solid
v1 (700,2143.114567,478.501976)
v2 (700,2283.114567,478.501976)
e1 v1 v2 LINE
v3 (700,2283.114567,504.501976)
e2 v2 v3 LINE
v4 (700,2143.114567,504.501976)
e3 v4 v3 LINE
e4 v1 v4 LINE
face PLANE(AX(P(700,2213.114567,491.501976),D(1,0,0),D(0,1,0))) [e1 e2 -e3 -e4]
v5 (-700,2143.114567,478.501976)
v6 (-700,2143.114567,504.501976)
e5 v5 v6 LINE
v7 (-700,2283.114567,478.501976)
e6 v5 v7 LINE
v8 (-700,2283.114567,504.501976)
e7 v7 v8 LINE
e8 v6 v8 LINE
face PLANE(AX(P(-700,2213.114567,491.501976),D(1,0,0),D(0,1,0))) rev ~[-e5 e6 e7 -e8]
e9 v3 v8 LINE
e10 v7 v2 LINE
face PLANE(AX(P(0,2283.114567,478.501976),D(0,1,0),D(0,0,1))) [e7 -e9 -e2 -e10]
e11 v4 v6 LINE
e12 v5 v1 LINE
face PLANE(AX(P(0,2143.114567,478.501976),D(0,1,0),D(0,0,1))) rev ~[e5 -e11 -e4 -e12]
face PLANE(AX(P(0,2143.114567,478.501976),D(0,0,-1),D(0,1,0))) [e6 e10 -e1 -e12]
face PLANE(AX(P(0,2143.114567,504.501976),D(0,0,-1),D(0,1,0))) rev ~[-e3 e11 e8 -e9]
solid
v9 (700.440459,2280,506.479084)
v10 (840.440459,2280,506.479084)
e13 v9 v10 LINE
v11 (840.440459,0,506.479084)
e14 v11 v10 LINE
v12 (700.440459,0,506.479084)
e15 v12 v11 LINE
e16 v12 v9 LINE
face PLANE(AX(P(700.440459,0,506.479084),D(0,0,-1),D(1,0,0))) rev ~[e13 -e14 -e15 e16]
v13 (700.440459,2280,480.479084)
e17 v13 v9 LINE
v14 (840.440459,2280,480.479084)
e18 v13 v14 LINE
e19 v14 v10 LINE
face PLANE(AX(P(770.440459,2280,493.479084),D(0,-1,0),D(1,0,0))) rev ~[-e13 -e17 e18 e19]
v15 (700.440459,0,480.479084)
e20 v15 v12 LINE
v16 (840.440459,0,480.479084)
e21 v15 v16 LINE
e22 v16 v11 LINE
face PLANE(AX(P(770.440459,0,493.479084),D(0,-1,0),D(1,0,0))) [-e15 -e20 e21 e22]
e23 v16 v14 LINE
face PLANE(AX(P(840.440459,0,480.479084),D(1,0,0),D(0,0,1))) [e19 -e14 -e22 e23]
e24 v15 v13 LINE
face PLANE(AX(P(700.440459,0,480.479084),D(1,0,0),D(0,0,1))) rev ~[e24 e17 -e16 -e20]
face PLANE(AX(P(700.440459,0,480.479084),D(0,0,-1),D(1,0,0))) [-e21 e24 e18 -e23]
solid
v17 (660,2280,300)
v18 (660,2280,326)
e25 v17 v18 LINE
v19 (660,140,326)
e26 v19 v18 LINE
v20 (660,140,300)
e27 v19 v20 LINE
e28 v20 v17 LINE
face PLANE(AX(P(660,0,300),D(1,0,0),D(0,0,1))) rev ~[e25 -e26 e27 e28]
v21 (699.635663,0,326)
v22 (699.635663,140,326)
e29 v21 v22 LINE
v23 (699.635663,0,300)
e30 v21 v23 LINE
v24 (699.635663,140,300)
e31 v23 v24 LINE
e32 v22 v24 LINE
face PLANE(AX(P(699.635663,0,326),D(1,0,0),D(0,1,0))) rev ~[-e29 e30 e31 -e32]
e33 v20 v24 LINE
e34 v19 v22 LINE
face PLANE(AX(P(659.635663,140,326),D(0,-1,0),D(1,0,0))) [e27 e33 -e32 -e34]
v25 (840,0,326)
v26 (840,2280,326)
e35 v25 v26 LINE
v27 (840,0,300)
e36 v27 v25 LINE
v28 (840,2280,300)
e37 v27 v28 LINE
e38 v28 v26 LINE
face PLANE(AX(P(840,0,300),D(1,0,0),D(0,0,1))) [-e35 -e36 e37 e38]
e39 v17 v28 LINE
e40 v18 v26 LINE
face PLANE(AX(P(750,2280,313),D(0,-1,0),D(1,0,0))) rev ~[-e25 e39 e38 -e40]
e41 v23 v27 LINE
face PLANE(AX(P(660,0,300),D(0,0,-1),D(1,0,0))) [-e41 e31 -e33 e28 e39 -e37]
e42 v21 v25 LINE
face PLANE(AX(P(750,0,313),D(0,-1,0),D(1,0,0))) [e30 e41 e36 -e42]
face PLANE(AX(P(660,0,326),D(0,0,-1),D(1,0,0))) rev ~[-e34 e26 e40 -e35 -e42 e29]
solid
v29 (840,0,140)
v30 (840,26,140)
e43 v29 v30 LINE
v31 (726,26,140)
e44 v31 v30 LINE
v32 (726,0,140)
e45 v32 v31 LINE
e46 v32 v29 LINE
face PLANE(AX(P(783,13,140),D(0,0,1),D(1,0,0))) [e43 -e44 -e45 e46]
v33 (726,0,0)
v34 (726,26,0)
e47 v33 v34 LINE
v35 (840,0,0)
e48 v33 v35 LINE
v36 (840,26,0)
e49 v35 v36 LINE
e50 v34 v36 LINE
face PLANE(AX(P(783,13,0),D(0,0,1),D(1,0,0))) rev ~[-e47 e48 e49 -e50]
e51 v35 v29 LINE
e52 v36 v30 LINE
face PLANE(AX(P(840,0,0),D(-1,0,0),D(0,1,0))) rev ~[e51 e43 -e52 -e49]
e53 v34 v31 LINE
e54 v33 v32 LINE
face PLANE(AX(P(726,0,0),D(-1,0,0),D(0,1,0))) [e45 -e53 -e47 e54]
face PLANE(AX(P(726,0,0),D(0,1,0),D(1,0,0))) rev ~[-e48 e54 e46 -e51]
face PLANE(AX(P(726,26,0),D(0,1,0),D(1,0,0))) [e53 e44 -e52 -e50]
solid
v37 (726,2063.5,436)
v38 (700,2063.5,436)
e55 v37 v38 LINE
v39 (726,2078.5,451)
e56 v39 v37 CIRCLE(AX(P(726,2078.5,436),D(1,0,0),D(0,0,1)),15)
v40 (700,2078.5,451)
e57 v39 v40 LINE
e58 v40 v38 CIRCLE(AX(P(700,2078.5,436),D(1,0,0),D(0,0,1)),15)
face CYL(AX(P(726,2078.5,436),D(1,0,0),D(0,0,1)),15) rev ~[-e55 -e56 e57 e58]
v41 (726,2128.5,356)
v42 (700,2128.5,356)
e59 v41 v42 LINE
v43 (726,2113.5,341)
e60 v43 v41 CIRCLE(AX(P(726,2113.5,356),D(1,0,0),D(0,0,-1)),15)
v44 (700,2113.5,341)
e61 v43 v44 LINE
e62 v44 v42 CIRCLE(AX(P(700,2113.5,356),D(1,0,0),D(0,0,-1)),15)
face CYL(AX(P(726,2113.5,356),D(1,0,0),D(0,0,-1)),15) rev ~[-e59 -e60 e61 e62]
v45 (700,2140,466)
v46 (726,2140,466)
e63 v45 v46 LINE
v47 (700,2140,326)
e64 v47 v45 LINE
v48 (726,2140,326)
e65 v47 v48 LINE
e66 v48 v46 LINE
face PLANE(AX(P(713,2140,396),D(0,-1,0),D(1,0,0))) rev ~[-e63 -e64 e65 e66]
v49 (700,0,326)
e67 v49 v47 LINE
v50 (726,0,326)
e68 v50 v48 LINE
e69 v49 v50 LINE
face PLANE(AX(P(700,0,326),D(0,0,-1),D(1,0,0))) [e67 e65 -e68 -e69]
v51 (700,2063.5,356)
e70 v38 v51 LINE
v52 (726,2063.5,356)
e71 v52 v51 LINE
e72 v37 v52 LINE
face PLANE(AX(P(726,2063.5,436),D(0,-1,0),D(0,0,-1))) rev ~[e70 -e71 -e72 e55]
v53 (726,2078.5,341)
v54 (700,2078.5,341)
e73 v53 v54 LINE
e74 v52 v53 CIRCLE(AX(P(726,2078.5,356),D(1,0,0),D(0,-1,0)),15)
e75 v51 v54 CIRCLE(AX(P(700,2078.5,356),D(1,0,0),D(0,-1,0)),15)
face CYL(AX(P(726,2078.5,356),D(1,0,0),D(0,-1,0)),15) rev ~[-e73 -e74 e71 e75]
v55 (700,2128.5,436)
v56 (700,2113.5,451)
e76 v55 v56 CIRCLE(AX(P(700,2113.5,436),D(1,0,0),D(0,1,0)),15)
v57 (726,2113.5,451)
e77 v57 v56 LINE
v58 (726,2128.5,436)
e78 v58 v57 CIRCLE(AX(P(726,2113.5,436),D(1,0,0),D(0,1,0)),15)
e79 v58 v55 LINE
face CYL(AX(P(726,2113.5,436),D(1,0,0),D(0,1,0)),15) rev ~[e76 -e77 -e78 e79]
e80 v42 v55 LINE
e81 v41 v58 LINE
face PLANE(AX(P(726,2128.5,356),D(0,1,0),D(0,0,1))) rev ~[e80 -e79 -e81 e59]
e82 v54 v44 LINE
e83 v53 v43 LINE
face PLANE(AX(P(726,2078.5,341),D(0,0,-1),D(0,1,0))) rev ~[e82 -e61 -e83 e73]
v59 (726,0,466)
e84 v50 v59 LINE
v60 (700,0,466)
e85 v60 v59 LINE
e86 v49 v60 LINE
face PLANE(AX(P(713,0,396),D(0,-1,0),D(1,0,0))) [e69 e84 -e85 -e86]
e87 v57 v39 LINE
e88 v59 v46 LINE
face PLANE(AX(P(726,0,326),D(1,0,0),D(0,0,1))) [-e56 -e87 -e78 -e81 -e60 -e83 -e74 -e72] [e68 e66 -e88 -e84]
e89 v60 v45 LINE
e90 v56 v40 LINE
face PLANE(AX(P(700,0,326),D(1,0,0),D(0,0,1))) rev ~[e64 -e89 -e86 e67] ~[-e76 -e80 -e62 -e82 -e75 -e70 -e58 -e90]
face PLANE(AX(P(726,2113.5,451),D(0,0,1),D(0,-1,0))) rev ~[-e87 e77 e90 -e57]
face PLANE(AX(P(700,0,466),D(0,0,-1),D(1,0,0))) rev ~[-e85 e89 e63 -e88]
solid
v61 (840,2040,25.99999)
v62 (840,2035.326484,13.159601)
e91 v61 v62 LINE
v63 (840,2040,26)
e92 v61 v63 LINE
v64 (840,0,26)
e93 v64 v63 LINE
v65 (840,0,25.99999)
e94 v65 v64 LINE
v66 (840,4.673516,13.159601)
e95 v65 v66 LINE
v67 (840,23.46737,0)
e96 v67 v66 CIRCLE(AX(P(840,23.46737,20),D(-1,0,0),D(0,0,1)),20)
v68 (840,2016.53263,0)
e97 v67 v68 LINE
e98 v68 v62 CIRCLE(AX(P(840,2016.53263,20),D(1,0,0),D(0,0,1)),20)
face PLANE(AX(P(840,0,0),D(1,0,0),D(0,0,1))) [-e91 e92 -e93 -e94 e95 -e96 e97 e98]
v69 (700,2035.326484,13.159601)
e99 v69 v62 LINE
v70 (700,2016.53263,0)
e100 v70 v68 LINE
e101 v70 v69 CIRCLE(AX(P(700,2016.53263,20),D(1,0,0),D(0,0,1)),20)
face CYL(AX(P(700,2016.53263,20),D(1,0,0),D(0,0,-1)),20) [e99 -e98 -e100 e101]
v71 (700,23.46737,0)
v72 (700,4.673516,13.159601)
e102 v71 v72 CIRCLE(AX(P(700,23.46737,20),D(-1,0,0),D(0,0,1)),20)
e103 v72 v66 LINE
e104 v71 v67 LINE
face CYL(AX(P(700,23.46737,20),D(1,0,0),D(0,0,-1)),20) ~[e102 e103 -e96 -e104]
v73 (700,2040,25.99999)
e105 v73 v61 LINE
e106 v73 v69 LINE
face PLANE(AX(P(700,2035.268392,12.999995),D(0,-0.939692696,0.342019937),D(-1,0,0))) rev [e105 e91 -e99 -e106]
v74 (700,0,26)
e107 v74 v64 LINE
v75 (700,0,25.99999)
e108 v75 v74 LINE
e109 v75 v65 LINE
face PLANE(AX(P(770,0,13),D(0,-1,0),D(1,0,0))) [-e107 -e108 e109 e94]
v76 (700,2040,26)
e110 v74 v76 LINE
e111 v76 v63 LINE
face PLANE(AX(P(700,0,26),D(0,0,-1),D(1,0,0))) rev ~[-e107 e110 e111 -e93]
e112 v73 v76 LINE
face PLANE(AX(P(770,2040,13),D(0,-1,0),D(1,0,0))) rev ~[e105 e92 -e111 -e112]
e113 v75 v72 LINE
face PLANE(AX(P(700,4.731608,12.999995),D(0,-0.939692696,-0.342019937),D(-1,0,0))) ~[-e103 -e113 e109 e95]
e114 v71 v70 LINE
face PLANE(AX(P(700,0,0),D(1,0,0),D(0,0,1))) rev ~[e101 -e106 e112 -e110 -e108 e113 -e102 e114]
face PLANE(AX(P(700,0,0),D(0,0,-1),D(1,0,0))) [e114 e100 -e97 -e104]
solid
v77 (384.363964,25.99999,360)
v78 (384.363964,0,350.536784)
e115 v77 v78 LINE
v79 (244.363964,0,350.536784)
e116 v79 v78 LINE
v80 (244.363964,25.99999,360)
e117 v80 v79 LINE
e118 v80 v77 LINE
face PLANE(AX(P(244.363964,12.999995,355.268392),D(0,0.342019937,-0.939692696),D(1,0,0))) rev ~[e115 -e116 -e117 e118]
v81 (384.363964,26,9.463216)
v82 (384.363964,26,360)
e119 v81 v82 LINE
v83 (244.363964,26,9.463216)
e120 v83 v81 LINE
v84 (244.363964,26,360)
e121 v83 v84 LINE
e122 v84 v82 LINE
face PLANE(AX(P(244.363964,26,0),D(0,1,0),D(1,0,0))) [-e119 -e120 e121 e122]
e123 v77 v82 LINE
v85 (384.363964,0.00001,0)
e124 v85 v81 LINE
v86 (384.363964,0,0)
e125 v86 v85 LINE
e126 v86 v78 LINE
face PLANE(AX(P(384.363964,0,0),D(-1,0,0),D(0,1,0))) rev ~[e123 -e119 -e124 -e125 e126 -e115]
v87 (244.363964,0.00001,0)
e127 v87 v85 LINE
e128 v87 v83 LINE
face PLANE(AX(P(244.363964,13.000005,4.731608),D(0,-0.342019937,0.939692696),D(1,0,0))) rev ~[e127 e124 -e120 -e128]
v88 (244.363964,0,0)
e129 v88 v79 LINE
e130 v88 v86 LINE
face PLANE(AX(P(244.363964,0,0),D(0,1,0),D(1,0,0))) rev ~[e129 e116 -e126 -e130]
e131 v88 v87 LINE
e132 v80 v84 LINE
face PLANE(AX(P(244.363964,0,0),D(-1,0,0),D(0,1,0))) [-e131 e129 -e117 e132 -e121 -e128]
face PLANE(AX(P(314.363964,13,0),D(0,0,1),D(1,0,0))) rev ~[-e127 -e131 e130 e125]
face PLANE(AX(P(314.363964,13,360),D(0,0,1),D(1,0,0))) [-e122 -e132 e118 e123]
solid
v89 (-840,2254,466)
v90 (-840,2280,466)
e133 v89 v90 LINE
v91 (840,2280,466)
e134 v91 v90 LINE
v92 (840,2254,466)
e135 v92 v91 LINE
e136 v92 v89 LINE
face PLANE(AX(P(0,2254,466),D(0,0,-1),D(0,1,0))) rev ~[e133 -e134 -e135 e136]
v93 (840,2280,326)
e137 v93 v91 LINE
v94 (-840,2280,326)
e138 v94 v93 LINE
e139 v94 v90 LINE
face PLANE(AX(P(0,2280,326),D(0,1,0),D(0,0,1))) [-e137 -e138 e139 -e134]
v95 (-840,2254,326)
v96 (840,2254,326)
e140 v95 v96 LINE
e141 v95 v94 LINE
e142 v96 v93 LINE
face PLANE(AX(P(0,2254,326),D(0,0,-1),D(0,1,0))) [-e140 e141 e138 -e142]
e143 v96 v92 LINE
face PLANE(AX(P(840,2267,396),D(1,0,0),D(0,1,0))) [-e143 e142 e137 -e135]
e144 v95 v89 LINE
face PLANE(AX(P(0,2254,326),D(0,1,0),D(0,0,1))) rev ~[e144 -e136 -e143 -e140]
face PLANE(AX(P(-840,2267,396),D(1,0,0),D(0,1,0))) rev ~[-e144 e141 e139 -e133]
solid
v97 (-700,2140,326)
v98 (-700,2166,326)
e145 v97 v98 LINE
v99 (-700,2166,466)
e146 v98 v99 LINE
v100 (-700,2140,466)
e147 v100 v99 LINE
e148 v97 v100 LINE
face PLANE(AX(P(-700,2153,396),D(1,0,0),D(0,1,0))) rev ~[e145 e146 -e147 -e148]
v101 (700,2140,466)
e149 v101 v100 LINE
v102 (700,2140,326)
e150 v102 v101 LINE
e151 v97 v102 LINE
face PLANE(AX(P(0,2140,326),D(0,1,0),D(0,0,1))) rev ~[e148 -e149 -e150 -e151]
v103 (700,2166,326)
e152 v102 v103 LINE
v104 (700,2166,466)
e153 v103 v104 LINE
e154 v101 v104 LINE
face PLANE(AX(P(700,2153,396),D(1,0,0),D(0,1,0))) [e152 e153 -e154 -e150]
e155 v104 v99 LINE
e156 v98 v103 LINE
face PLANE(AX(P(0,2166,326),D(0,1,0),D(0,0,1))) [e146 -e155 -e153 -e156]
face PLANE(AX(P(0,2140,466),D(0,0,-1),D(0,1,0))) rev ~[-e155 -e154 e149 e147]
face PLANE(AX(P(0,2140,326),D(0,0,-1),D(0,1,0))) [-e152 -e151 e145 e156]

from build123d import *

# Parameters (mm, degrees)
F0_W        = 140
F0_H        = 26
F1_DEPTH    = 2040
F2_SIZE2    = 9.463216
F2_SIZE     = 25.99999
F2_2_SIZE2  = 9.463216
F2_2_SIZE   = 25.99999
F3_W        = 180
F3_H        = 26
F4_DEPTH    = 2280
F5_W        = 40
F5_H        = 140
F6_DEPTH    = 26
F7_W        = 114
F7_H        = 26
F8_DEPTH    = 140
F9_W        = 26
F9_H        = 140
F10_DEPTH   = 2140
F12_W       = 26
F12_H       = 140
F13_DEPTH   = 840
F14_W       = 26
F14_H       = 140
F15_DEPTH   = 700
F16_W       = 140
F16_H       = 26
F17_DEPTH   = 360
F18_SIZE2   = 9.463216
F18_SIZE    = 25.99999
F18_2_SIZE2 = 9.463216
F18_2_SIZE  = 25.99999
F19_W       = 140
F19_H       = 26
F20_DEPTH   = 700
F21_W       = 140
F21_H       = 26
F22_DEPTH   = 2280
F23_DEPTH   = 1566.001
F24_R       = 20


# Not quite as in the source:
# - a fillet or chamfer is up to 0.001 mm smaller than in the source, because OpenCascade refuses the exact size


with BuildPart() as f1:
    # F0 (on Front) → F1 (new body)
    with BuildSketch(Plane.XZ):
        with Locations((770, 13)):
            Rectangle(F0_W, F0_H)
    extrude(amount=-F1_DEPTH)

    # F2 (size 26 and 9.4632260909 in the source; OpenCascade refuses exactly that, so slightly less here)
    f2_edges = [f1.edges().sort_by_distance(p)[0] for p in [
        (770, 0, 0),
    ]]
    f2_side = f1.faces().sort_by_distance((770, 0, 13))[0]
    chamfer(f2_edges, length=F2_SIZE, length2=F2_SIZE2, reference=f2_side)

    # F2#2 (size 26 and 9.4632260909 in the source; OpenCascade refuses exactly that, so slightly less here)
    f2_2_edges = [f1.edges().sort_by_distance(p)[0] for p in [
        (770, 2040, 0),
    ]]
    f2_2_side = f1.faces().sort_by_distance((770, 2040, 13))[0]
    chamfer(f2_2_edges, length=F2_2_SIZE, length2=F2_2_SIZE2, reference=f2_2_side)

    # F24
    f24_edges = [f1.edges().sort_by_distance(p)[0] for p in [
        (770, 9.463216, 0),
        (770, 2030.536784, 0),
    ]]
    fillet(f24_edges, radius=F24_R)


with BuildPart() as f4:
    # F3 (on Front) → F4 (new body)
    with BuildSketch(Plane.XZ):
        with Locations((750, 313)):
            Rectangle(F3_W, F3_H)
    extrude(amount=-F4_DEPTH)

    # F5 (on face) → F6 (cut, through all)
    with BuildSketch(Plane.XY.offset(326)):
        with Locations((679.6356630325, 70)):
            Rectangle(F5_W, F5_H)
    extrude(amount=-F6_DEPTH, mode=Mode.SUBTRACT)


with BuildPart() as f8:
    # F7 (on Top) → F8 (new body)
    with BuildSketch(Plane.XY):
        with Locations((783, 13)):
            Rectangle(F7_W, F7_H)
    extrude(amount=F8_DEPTH)


with BuildPart() as f10:
    # F9 (on Front) → F10 (new body)
    with BuildSketch(Plane.XZ):
        with Locations((713, 396)):
            Rectangle(F9_W, F9_H)
    extrude(amount=-F10_DEPTH)

    # F11 (on face) → F23 (cut, through all)
    with BuildSketch(Plane.YZ.offset(726)):
        with BuildLine():
            ThreePointArc((2128.5, 436), (2124.1066017178, 446.6066017178), (2113.5, 451))
            Line((2113.5, 451), (2078.5, 451))
            ThreePointArc((2078.5, 451), (2067.8933982822, 446.6066017178), (2063.5, 436))
            Line((2063.5, 436), (2063.5, 356))
            ThreePointArc((2063.5, 356), (2067.8933982822, 345.3933982822), (2078.5, 341))
            Line((2078.5, 341), (2113.5, 341))
            ThreePointArc((2113.5, 341), (2124.1066017178, 345.3933982822), (2128.5, 356))
            Line((2128.5, 356), (2128.5, 436))
        make_face()
    extrude(amount=-F23_DEPTH, mode=Mode.SUBTRACT)


with BuildPart() as f13:
    # F12 (on Right) → F13 (new body, symmetric)
    with BuildSketch(Plane.YZ):
        with Locations((2267, 396)):
            Rectangle(F12_W, F12_H)
    extrude(amount=F13_DEPTH, both=True)


with BuildPart() as f15:
    # F14 (on Right) → F15 (new body, symmetric)
    with BuildSketch(Plane.YZ):
        with Locations((2153, 396)):
            Rectangle(F14_W, F14_H)
    extrude(amount=F15_DEPTH, both=True)


with BuildPart() as f17:
    # F16 (on Top) → F17 (new body)
    with BuildSketch(Plane.XY):
        with Locations((314.363963604, 13)):
            Rectangle(F16_W, F16_H)
    extrude(amount=F17_DEPTH)

    # F18 (size 26 and 9.4632260909 in the source; OpenCascade refuses exactly that, so slightly less here)
    f18_edges = [f17.edges().sort_by_distance(p)[0] for p in [
        (314.363964, 0, 360),
    ]]
    f18_side = f17.faces().sort_by_distance((314.363964, 13, 360))[0]
    chamfer(f18_edges, length=F18_SIZE, length2=F18_SIZE2, reference=f18_side)

    # F18#2 (size 26 and 9.4632260909 in the source; OpenCascade refuses exactly that, so slightly less here)
    f18_2_edges = [f17.edges().sort_by_distance(p)[0] for p in [
        (314.363964, 26, 0),
    ]]
    f18_2_side = f17.faces().sort_by_distance((314.363964, 13, 0))[0]
    chamfer(f18_2_edges, length=F18_2_SIZE, length2=F18_2_SIZE2, reference=f18_2_side)


with BuildPart() as f20:
    # F19 (on Right) → F20 (new body, symmetric)
    with BuildSketch(Plane.YZ):
        with Locations((2213.114566803, 491.5019755363)):
            Rectangle(F19_W, F19_H)
    extrude(amount=F20_DEPTH, both=True)


with BuildPart() as f22:
    # F21 (on Front) → F22 (new body)
    with BuildSketch(Plane.XZ):
        with Locations((770.4404592514, 493.4790836821)):
            Rectangle(F21_W, F21_H)
    extrude(amount=-F22_DEPTH)


solid = Compound([f1.part, f4.part, f8.part, f10.part, f13.part, f15.part, f17.part, f20.part, f22.part])
